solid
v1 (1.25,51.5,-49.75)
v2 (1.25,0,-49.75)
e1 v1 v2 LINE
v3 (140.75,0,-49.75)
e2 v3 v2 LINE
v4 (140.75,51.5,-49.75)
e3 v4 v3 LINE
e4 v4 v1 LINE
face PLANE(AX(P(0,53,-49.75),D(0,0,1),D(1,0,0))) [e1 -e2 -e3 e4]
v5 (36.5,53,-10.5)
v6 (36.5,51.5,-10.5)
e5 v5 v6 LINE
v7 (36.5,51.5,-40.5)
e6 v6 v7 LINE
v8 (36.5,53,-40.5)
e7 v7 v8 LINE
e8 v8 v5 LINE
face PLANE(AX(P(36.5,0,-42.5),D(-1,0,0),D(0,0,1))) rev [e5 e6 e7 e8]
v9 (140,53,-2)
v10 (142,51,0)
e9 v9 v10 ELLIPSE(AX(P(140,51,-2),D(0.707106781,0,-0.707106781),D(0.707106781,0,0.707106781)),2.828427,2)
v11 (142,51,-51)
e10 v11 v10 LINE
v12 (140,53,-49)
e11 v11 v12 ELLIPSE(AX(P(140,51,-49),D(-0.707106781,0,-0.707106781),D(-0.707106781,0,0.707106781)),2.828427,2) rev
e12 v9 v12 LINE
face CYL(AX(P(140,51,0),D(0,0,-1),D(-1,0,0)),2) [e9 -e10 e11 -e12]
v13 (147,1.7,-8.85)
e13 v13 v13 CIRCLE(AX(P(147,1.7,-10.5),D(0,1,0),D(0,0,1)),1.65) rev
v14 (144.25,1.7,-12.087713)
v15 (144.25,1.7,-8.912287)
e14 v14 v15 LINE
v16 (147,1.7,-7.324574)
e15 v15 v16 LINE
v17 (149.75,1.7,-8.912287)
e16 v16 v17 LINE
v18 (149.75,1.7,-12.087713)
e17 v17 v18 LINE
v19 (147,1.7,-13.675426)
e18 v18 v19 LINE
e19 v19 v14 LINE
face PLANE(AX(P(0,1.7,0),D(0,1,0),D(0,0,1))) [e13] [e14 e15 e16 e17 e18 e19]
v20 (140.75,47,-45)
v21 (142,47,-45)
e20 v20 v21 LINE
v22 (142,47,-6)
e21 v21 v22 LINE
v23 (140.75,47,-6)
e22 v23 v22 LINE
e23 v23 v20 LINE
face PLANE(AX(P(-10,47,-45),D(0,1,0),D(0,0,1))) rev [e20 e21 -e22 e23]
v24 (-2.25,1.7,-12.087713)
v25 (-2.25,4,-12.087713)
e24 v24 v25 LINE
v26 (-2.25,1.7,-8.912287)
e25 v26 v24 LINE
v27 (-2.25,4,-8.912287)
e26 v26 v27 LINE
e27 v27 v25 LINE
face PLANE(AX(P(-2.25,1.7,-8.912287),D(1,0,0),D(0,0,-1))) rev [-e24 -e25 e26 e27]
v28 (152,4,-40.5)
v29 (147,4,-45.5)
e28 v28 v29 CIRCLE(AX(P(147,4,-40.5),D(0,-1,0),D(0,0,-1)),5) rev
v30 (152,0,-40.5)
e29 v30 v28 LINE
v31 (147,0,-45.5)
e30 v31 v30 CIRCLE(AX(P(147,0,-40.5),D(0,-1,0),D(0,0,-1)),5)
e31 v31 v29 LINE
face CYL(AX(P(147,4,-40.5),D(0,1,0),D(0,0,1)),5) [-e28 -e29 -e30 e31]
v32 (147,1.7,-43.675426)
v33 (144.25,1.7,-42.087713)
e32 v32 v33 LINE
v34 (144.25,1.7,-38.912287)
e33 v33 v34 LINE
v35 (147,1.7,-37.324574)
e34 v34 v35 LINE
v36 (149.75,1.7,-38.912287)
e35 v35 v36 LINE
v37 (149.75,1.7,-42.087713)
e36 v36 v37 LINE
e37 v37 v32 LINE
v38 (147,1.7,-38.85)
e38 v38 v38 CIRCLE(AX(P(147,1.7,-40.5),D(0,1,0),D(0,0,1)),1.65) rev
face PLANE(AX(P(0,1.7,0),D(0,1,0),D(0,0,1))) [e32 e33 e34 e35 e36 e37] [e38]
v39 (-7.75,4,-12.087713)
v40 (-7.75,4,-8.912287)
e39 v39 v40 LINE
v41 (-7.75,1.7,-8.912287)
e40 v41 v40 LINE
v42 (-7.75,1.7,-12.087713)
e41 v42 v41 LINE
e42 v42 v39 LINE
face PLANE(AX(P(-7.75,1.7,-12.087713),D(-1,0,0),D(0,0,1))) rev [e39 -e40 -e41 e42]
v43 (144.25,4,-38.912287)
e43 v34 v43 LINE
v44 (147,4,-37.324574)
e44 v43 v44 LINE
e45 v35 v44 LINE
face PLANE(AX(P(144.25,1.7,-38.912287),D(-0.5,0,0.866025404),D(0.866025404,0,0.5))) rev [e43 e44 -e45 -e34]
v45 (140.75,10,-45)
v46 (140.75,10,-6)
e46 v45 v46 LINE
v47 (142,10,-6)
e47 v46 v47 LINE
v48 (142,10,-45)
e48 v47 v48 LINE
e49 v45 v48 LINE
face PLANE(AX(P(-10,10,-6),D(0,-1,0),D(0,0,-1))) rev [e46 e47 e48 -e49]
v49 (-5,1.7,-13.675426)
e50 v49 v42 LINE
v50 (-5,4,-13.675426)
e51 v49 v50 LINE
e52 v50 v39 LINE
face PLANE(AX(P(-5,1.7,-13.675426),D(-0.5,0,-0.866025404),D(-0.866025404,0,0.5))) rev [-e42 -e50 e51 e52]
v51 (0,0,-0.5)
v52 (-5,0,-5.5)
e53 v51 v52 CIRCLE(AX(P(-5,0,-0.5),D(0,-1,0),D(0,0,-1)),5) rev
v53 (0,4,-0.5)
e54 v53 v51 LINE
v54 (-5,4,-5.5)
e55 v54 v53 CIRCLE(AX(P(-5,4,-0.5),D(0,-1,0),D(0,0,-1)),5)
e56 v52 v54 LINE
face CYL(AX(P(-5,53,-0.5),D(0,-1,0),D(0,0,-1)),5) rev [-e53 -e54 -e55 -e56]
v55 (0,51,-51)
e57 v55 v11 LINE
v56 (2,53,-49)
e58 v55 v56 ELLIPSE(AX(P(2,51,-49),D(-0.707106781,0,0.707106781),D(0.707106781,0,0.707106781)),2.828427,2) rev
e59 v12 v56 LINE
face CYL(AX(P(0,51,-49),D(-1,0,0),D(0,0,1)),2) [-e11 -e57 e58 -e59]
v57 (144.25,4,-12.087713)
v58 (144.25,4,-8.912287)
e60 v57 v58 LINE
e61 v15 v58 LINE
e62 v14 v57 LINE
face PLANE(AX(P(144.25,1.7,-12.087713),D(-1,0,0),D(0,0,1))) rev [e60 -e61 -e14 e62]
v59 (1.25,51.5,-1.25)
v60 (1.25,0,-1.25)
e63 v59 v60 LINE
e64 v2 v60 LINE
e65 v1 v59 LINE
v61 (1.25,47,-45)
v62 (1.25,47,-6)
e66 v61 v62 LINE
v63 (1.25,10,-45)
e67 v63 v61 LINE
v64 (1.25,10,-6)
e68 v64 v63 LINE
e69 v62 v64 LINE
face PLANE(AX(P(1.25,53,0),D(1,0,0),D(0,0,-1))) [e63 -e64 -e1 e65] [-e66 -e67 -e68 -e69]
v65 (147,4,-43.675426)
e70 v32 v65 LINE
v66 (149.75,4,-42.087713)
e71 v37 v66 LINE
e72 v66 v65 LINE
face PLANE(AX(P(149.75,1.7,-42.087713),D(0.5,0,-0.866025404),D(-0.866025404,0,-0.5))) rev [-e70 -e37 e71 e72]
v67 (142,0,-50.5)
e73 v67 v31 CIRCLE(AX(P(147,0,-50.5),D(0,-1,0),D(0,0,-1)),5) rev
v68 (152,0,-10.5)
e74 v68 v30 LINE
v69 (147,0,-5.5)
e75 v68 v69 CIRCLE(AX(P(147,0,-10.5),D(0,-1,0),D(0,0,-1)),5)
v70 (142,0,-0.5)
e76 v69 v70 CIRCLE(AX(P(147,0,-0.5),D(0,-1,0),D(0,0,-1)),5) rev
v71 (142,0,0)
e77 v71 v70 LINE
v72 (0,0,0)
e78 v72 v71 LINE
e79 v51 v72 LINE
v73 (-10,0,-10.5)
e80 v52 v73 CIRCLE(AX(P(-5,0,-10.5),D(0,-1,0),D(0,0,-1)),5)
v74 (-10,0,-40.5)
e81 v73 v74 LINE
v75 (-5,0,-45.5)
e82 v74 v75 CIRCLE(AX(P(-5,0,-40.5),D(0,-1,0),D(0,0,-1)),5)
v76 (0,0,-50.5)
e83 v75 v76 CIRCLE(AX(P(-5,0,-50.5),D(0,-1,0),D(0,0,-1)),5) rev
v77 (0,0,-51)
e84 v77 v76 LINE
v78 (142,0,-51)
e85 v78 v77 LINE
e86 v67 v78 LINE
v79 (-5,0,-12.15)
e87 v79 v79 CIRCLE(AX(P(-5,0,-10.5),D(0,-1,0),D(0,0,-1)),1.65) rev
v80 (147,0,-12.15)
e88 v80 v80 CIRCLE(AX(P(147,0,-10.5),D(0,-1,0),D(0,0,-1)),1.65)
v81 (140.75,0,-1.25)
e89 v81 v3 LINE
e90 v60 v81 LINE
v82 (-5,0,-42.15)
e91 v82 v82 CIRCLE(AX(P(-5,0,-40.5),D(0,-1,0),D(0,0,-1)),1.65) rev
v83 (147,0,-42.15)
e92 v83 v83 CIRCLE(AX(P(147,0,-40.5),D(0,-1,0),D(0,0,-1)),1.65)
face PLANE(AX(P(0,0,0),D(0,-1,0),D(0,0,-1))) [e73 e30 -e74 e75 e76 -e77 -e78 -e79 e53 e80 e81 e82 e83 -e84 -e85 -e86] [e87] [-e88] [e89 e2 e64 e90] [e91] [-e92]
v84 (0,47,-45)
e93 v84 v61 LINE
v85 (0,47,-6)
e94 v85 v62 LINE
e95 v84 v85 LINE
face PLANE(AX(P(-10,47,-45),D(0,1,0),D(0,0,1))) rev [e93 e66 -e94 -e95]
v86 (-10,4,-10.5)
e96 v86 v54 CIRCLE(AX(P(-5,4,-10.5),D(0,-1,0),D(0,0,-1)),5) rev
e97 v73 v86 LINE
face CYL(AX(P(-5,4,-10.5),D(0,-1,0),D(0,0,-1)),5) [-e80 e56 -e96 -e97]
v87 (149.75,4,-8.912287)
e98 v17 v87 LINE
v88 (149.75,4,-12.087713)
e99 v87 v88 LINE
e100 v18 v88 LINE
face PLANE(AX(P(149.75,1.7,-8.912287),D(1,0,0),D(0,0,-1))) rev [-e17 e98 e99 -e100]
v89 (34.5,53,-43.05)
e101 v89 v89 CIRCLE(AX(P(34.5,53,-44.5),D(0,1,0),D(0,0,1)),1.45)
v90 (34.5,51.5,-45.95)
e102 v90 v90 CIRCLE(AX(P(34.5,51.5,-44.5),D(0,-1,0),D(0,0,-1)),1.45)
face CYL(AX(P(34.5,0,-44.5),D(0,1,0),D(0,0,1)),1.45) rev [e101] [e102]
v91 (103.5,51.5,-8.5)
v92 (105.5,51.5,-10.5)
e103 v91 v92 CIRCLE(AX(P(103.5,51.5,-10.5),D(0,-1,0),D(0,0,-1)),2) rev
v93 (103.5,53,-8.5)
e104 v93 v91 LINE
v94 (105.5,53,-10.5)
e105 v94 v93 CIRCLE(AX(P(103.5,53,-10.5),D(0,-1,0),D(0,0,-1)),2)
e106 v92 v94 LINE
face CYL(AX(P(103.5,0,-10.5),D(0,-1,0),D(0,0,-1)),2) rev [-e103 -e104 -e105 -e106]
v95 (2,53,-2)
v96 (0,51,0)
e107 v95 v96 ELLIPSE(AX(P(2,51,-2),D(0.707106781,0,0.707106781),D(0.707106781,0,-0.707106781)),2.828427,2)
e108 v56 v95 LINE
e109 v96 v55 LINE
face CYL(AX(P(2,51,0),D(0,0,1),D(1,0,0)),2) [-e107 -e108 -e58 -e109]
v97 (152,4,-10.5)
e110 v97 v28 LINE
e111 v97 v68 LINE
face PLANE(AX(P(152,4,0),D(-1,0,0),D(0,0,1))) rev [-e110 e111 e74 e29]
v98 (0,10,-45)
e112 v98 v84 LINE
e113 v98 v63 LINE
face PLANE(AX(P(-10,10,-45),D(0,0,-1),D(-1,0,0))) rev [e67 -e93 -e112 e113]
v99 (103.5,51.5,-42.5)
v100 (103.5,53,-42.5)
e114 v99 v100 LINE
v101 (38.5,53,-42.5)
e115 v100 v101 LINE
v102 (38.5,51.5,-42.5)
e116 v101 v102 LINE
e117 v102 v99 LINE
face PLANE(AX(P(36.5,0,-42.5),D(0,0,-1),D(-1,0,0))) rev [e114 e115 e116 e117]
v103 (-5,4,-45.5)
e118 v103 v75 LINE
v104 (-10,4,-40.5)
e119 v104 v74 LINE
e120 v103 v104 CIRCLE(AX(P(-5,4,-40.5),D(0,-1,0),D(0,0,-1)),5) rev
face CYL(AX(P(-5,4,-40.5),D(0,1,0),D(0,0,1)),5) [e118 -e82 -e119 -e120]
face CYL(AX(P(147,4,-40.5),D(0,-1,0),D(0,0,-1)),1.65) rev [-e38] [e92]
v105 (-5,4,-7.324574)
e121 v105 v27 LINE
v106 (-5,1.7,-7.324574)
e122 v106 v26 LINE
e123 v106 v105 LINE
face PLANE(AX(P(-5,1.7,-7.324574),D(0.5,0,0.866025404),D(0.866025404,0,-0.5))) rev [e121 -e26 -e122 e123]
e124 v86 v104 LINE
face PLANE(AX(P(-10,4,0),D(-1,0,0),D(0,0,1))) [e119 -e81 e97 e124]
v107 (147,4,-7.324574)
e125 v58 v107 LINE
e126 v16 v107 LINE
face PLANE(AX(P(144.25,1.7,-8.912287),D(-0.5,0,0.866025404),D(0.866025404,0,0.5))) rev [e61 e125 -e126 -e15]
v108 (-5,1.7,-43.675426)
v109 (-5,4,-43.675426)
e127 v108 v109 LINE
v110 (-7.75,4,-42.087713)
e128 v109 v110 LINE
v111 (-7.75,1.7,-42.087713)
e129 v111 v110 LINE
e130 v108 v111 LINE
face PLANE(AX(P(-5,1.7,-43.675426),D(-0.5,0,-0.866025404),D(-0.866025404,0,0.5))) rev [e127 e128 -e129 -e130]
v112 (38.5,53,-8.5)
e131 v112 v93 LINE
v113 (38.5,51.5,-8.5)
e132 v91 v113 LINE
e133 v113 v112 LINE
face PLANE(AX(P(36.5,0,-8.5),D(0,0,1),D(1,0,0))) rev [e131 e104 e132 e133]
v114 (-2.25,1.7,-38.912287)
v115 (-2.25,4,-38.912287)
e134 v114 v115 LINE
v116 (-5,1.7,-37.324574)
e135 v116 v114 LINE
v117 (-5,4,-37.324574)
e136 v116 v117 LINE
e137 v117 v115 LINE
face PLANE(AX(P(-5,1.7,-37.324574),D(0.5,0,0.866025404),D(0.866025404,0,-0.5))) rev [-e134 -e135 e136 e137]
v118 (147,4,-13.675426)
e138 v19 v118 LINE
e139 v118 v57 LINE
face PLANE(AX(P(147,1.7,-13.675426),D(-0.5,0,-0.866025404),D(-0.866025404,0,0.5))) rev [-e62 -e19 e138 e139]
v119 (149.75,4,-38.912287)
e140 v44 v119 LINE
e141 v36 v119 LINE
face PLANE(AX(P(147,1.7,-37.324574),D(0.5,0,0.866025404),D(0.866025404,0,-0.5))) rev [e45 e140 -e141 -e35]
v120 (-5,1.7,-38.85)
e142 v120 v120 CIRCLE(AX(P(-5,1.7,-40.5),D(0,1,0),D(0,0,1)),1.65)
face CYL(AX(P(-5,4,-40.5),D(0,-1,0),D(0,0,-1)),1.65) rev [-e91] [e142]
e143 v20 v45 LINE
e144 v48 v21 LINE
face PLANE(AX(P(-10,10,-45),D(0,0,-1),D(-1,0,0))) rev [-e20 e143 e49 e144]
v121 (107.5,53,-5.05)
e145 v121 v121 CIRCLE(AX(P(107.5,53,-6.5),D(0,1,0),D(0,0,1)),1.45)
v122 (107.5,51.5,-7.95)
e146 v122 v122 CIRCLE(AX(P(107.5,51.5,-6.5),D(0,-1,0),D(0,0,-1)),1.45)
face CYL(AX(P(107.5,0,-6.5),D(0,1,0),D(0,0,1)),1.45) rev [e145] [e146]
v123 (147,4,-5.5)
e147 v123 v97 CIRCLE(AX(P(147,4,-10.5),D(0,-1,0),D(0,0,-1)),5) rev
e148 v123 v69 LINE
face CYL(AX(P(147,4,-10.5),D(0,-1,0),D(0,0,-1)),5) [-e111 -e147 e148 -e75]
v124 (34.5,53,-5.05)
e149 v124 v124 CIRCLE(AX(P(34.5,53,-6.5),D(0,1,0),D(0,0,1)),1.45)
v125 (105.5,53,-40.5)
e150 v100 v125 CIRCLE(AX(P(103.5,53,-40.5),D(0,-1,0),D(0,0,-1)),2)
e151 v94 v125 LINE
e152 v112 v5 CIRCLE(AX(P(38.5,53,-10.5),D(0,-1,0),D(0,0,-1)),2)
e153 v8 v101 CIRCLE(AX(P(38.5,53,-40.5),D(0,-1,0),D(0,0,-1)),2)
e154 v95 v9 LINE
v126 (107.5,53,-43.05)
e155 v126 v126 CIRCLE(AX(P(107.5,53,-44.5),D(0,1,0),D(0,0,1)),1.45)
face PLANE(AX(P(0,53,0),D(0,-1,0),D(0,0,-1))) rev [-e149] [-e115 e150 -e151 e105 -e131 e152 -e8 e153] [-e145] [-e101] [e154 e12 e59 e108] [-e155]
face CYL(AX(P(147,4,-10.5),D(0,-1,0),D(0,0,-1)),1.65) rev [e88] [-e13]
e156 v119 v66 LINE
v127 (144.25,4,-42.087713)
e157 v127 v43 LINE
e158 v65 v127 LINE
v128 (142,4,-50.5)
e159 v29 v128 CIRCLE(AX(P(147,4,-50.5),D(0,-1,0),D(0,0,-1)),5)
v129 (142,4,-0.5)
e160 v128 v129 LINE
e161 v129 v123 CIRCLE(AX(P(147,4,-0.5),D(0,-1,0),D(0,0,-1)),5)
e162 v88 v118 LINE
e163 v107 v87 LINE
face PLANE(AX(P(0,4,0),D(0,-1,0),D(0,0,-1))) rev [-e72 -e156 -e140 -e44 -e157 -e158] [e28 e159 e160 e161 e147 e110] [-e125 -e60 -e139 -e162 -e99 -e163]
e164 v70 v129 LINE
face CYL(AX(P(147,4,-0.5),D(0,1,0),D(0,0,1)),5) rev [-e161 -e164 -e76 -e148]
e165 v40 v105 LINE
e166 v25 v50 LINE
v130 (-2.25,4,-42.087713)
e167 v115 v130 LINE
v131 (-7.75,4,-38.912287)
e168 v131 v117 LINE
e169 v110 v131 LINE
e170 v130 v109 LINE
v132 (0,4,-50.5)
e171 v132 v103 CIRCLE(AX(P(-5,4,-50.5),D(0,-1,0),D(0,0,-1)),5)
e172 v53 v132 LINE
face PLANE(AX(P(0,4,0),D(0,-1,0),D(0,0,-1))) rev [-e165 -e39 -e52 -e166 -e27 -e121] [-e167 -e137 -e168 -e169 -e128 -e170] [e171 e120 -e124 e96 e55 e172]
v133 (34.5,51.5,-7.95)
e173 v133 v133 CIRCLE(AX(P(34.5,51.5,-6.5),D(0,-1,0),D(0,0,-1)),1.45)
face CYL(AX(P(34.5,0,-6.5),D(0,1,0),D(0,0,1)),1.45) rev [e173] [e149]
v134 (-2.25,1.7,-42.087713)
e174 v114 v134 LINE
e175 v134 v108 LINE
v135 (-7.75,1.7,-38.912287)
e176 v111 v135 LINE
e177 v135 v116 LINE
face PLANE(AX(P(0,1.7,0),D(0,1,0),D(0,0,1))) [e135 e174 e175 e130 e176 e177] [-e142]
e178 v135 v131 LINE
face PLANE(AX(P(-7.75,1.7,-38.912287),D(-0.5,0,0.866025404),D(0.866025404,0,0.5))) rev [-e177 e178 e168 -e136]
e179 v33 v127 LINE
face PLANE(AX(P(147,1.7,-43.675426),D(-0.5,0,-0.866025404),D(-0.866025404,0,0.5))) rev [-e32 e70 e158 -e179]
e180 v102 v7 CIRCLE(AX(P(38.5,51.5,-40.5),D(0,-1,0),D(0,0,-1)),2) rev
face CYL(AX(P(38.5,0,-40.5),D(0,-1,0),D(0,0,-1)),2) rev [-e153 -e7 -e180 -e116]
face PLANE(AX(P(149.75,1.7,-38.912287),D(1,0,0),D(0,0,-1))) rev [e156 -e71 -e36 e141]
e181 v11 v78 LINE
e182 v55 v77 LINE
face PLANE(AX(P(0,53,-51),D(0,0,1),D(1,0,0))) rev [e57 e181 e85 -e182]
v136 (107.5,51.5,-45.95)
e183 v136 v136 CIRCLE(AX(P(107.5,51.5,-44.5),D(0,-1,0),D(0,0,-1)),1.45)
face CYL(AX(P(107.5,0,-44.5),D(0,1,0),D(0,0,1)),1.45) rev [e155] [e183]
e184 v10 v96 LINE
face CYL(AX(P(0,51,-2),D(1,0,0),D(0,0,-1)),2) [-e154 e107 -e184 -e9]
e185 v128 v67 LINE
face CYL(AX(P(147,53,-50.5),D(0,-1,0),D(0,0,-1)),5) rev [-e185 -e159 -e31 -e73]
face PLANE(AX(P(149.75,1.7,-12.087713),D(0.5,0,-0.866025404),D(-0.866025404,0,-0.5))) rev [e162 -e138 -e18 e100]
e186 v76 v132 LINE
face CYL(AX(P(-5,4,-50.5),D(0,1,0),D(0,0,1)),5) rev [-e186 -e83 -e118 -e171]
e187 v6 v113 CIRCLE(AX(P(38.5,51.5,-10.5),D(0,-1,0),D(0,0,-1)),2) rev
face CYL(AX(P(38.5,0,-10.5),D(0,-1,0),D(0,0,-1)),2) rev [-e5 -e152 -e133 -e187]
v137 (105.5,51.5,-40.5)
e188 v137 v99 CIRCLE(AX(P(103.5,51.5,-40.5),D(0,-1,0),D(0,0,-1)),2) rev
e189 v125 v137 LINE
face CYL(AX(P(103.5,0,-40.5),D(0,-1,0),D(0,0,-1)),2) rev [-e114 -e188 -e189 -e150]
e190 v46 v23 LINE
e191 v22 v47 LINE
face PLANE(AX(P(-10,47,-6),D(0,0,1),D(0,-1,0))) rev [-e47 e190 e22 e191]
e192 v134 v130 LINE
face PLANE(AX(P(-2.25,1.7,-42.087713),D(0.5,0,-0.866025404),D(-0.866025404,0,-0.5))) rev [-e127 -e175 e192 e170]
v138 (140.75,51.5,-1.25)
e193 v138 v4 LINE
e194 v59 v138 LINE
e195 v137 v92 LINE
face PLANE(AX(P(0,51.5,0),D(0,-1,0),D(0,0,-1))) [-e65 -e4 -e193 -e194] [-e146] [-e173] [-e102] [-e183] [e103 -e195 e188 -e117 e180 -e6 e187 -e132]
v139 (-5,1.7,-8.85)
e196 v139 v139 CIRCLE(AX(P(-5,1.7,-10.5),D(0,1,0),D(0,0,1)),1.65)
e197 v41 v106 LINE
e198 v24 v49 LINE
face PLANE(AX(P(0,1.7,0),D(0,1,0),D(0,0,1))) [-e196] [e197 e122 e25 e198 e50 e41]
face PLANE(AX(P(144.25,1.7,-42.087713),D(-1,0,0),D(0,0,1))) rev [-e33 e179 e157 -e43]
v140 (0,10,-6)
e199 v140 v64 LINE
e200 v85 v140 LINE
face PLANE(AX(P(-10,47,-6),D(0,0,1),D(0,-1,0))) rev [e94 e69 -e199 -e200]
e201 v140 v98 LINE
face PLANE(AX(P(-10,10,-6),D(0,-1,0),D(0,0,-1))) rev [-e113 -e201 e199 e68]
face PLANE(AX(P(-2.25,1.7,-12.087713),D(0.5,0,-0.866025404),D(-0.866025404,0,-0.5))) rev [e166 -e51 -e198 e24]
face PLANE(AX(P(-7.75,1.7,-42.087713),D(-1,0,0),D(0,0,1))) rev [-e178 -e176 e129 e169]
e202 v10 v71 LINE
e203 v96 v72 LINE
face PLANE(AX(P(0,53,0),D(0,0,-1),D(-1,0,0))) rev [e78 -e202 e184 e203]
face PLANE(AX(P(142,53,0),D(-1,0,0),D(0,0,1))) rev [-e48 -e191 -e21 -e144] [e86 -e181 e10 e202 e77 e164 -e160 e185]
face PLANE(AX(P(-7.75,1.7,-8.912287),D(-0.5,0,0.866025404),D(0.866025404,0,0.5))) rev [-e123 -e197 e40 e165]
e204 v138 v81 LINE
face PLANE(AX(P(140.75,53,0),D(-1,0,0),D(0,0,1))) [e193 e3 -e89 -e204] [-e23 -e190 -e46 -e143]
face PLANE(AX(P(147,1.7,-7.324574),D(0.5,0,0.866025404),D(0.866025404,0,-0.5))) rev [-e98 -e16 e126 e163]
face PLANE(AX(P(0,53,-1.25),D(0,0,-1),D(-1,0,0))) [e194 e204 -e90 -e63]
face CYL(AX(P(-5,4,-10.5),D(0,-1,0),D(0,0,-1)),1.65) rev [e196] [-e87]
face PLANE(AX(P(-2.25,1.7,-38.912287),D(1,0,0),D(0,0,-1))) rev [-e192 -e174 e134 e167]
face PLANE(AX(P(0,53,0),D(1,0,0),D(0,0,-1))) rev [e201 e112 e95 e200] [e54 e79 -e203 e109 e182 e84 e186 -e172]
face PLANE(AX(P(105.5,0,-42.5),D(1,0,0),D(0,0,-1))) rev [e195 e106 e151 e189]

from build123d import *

# Parameters (mm, degrees)
SKETCH1_W                 = 142
SKETCH1_H                 = 51
BOSS_EXTRUDE1_DEPTH       = 53
SHELL1_T                  = -1.25
SHELL1_THICKNESS_2_FACE_W = 48.5
SHELL1_THICKNESS_2_FACE_H = 139.5
SHELL1_THICKNESS_2_DEPTH  = 0.25
SKETCH2_W                 = 10
SKETCH2_H                 = 40
SKETCH2_R                 = 1.65
BOSS_EXTRUDE2_DEPTH       = 4
SKETCH3_W                 = 39
SKETCH3_H                 = 37
CUT_EXTRUDE1_DEPTH        = 169.860889492
CUT_EXTRUDE2_DEPTH        = 2.3
FILLET2_START             = -1
FILLET2_DEPTH             = 5
FILLET2_2_DEPTH           = 4
SKETCH5_R                 = 1.45
CUT_EXTRUDE3_DEPTH        = 169.860889492
SKETCH7_W                 = 69
SKETCH7_H                 = 34
CUT_EXTRUDE4_DEPTH        = 169.860889492
FILLET6_R                 = 2
FILLET7_R                 = 2


with BuildPart() as part:
    # Sketch1 → Boss-Extrude1 (new body)
    with BuildSketch(Plane(origin=(0, 0, 0), x_dir=(1, 0, 0), z_dir=(0, 1, 0))):
        with Locations((71, 25.5)):
            Rectangle(SKETCH1_W, SKETCH1_H)
    extrude(amount=BOSS_EXTRUDE1_DEPTH)

    # Shell1
    shell1_openings = [part.faces().sort_by_distance(p)[0] for p in [
        (71, 0, -25.5),
    ]]
    offset(amount=SHELL1_T, openings=shell1_openings, kind=Kind.INTERSECTION)

    # Shell1 thickness 2 face (on inner face of the shell) → Shell1 thickness 2 (add)
    with BuildSketch(Plane(origin=(71, 51.75, -25.5), x_dir=(0, 0, 1), z_dir=(0, 1, 0))):
        Rectangle(SHELL1_THICKNESS_2_FACE_W, SHELL1_THICKNESS_2_FACE_H)
    extrude(amount=-SHELL1_THICKNESS_2_DEPTH)

    # Sketch2 → Boss-Extrude2 (add)
    # profile 1 of 2: a face of its own
    with BuildSketch(Plane.XZ):
        with Locations((147, -25.5)):
            Rectangle(SKETCH2_W, SKETCH2_H)
        with Locations(Location((147, -40.5, 0), (0, 0, 270))):
            Circle(SKETCH2_R, mode=Mode.SUBTRACT)
        with Locations(Location((147, -10.5, 0), (0, 0, 270))):
            Circle(SKETCH2_R, mode=Mode.SUBTRACT)
    # profile 2 of 2: a face of its own
    with BuildSketch(Plane.XZ):
        with Locations((-5, -25.5)):
            Rectangle(SKETCH2_W, SKETCH2_H)
        with Locations(Location((-5, -40.5, 0), (0, 0, 270))):
            Circle(SKETCH2_R, mode=Mode.SUBTRACT)
        with Locations(Location((-5, -10.5, 0), (0, 0, 270))):
            Circle(SKETCH2_R, mode=Mode.SUBTRACT)
    extrude(amount=-BOSS_EXTRUDE2_DEPTH)

    # Sketch3 → Cut-Extrude1 (cut, through all)
    with BuildSketch(Plane(origin=(142, 0, 0), x_dir=(0, 0, -1), z_dir=(1, 0, 0))):
        with Locations((25.5, 28.5)):
            Rectangle(SKETCH3_W, SKETCH3_H)
    extrude(amount=-CUT_EXTRUDE1_DEPTH, mode=Mode.SUBTRACT)

    # Sketch4 → Cut-Extrude2 (cut)
    with BuildSketch(Plane(origin=(0, 4, 0), x_dir=(1, 0, 0), z_dir=(0, 1, 0))):
        Polygon((-5, 43.675426481), (-7.75, 42.08771324), (-7.75, 38.91228676), (-5, 37.324573519), (-2.25, 38.91228676), (-2.25, 42.08771324), align=None)
        Polygon((-5, 13.675426481), (-7.75, 12.08771324), (-7.75, 8.91228676), (-5, 7.324573519), (-2.25, 8.91228676), (-2.25, 12.08771324), align=None)
        Polygon((147, 43.675426481), (144.25, 42.08771324), (144.25, 38.91228676), (147, 37.324573519), (149.75, 38.91228676), (149.75, 42.08771324), align=None)
        Polygon((147, 13.675426481), (144.25, 12.08771324), (144.25, 8.91228676), (147, 7.324573519), (149.75, 8.91228676), (149.75, 12.08771324), align=None)
    extrude(amount=-CUT_EXTRUDE2_DEPTH, mode=Mode.SUBTRACT)

    # Fillet2: read off the stored shape, not the designer's step
    # Fillet2 outline → Fillet2 (cut)
    with BuildSketch(Plane(origin=(0, 0, 0), x_dir=(1, 0, 0), z_dir=(0, 1, 0)).offset(FILLET2_START)):
        with BuildLine():
            Line((-10, 5.5), (-5, 5.5))
            ThreePointArc((-5, 5.5), (-8.535533906, 6.964466094), (-10, 10.5))
            Line((-10, 10.5), (-10, 5.5))
        make_face()
        with BuildLine():
            Line((-10, 45.5), (-10, 40.5))
            ThreePointArc((-10, 40.5), (-8.535533906, 44.035533906), (-5, 45.5))
            Line((-5, 45.5), (-10, 45.5))
        make_face()
        with BuildLine():
            ThreePointArc((152, 10.5), (150.535533906, 6.964466094), (147, 5.5))
            Line((147, 5.5), (152, 5.5))
            Line((152, 5.5), (152, 10.5))
        make_face()
        with BuildLine():
            ThreePointArc((147, 45.5), (150.535533906, 44.035533906), (152, 40.5))
            Line((152, 40.5), (152, 45.5))
            Line((152, 45.5), (147, 45.5))
        make_face()
    extrude(amount=FILLET2_DEPTH, mode=Mode.SUBTRACT)

    # Fillet2 2 outline → Fillet2 2 (add)
    with BuildSketch(Plane(origin=(0, 0, 0), x_dir=(1, 0, 0), z_dir=(0, 1, 0))):
        with BuildLine():
            Line((0, 5.5), (-5, 5.5))
            ThreePointArc((-5, 5.5), (-1.464466094, 4.035533906), (0, 0.5))
            Line((0, 0.5), (0, 5.5))
        make_face()
        with BuildLine():
            Line((-5, 45.5), (0, 45.5))
            Line((0, 45.5), (0, 50.5))
            ThreePointArc((0, 50.5), (-1.464466094, 46.964466094), (-5, 45.5))
        make_face()
        with BuildLine():
            ThreePointArc((142, 0.5), (143.464466094, 4.035533906), (147, 5.5))
            Line((147, 5.5), (142, 5.5))
            Line((142, 5.5), (142, 0.5))
        make_face()
        with BuildLine():
            Line((142, 50.5), (142, 45.5))
            Line((142, 45.5), (147, 45.5))
            ThreePointArc((147, 45.5), (143.464466094, 46.964466094), (142, 50.5))
        make_face()
    extrude(amount=FILLET2_2_DEPTH)

    # Sketch5 → Cut-Extrude3 (cut, through all)
    with BuildSketch(Plane(origin=(0, 53, 0), x_dir=(1, 0, 0), z_dir=(0, 1, 0))):
        with Locations(Location((34.5, 44.5, 0), (0, 0, 270))):
            Circle(SKETCH5_R)
        with Locations(Location((34.5, 6.5, 0), (0, 0, 270))):
            Circle(SKETCH5_R)
        with Locations(Location((107.5, 6.5, 0), (0, 0, 270))):
            Circle(SKETCH5_R)
        with Locations(Location((107.5, 44.5, 0), (0, 0, 270))):
            Circle(SKETCH5_R)
    extrude(amount=-CUT_EXTRUDE3_DEPTH, mode=Mode.SUBTRACT)

    # Sketch7 → Cut-Extrude4 (cut, through all)
    with BuildSketch(Plane(origin=(0, 53, 0), x_dir=(1, 0, 0), z_dir=(0, 1, 0))):
        with Locations((71, 25.5)):
            Rectangle(SKETCH7_W, SKETCH7_H)
    extrude(amount=-CUT_EXTRUDE4_DEPTH, mode=Mode.SUBTRACT)

    # Fillet6
    fillet6_edges = [part.edges().sort_by_distance(p)[0] for p in [
        (36.5, 52.25, -8.5),
        (36.5, 52.25, -42.5),
        (105.5, 52.25, -42.5),
        (105.5, 52.25, -8.5),
    ]]
    fillet(fillet6_edges, radius=FILLET6_R)

    # Fillet7
    fillet7_edges = [part.edges().sort_by_distance(p)[0] for p in [
        (142, 53, -25.5),
        (71, 53, -51),
        (0, 53, -25.5),
        (71, 53, 0),
    ]]
    fillet(fillet7_edges, radius=FILLET7_R)


solid = part.part
